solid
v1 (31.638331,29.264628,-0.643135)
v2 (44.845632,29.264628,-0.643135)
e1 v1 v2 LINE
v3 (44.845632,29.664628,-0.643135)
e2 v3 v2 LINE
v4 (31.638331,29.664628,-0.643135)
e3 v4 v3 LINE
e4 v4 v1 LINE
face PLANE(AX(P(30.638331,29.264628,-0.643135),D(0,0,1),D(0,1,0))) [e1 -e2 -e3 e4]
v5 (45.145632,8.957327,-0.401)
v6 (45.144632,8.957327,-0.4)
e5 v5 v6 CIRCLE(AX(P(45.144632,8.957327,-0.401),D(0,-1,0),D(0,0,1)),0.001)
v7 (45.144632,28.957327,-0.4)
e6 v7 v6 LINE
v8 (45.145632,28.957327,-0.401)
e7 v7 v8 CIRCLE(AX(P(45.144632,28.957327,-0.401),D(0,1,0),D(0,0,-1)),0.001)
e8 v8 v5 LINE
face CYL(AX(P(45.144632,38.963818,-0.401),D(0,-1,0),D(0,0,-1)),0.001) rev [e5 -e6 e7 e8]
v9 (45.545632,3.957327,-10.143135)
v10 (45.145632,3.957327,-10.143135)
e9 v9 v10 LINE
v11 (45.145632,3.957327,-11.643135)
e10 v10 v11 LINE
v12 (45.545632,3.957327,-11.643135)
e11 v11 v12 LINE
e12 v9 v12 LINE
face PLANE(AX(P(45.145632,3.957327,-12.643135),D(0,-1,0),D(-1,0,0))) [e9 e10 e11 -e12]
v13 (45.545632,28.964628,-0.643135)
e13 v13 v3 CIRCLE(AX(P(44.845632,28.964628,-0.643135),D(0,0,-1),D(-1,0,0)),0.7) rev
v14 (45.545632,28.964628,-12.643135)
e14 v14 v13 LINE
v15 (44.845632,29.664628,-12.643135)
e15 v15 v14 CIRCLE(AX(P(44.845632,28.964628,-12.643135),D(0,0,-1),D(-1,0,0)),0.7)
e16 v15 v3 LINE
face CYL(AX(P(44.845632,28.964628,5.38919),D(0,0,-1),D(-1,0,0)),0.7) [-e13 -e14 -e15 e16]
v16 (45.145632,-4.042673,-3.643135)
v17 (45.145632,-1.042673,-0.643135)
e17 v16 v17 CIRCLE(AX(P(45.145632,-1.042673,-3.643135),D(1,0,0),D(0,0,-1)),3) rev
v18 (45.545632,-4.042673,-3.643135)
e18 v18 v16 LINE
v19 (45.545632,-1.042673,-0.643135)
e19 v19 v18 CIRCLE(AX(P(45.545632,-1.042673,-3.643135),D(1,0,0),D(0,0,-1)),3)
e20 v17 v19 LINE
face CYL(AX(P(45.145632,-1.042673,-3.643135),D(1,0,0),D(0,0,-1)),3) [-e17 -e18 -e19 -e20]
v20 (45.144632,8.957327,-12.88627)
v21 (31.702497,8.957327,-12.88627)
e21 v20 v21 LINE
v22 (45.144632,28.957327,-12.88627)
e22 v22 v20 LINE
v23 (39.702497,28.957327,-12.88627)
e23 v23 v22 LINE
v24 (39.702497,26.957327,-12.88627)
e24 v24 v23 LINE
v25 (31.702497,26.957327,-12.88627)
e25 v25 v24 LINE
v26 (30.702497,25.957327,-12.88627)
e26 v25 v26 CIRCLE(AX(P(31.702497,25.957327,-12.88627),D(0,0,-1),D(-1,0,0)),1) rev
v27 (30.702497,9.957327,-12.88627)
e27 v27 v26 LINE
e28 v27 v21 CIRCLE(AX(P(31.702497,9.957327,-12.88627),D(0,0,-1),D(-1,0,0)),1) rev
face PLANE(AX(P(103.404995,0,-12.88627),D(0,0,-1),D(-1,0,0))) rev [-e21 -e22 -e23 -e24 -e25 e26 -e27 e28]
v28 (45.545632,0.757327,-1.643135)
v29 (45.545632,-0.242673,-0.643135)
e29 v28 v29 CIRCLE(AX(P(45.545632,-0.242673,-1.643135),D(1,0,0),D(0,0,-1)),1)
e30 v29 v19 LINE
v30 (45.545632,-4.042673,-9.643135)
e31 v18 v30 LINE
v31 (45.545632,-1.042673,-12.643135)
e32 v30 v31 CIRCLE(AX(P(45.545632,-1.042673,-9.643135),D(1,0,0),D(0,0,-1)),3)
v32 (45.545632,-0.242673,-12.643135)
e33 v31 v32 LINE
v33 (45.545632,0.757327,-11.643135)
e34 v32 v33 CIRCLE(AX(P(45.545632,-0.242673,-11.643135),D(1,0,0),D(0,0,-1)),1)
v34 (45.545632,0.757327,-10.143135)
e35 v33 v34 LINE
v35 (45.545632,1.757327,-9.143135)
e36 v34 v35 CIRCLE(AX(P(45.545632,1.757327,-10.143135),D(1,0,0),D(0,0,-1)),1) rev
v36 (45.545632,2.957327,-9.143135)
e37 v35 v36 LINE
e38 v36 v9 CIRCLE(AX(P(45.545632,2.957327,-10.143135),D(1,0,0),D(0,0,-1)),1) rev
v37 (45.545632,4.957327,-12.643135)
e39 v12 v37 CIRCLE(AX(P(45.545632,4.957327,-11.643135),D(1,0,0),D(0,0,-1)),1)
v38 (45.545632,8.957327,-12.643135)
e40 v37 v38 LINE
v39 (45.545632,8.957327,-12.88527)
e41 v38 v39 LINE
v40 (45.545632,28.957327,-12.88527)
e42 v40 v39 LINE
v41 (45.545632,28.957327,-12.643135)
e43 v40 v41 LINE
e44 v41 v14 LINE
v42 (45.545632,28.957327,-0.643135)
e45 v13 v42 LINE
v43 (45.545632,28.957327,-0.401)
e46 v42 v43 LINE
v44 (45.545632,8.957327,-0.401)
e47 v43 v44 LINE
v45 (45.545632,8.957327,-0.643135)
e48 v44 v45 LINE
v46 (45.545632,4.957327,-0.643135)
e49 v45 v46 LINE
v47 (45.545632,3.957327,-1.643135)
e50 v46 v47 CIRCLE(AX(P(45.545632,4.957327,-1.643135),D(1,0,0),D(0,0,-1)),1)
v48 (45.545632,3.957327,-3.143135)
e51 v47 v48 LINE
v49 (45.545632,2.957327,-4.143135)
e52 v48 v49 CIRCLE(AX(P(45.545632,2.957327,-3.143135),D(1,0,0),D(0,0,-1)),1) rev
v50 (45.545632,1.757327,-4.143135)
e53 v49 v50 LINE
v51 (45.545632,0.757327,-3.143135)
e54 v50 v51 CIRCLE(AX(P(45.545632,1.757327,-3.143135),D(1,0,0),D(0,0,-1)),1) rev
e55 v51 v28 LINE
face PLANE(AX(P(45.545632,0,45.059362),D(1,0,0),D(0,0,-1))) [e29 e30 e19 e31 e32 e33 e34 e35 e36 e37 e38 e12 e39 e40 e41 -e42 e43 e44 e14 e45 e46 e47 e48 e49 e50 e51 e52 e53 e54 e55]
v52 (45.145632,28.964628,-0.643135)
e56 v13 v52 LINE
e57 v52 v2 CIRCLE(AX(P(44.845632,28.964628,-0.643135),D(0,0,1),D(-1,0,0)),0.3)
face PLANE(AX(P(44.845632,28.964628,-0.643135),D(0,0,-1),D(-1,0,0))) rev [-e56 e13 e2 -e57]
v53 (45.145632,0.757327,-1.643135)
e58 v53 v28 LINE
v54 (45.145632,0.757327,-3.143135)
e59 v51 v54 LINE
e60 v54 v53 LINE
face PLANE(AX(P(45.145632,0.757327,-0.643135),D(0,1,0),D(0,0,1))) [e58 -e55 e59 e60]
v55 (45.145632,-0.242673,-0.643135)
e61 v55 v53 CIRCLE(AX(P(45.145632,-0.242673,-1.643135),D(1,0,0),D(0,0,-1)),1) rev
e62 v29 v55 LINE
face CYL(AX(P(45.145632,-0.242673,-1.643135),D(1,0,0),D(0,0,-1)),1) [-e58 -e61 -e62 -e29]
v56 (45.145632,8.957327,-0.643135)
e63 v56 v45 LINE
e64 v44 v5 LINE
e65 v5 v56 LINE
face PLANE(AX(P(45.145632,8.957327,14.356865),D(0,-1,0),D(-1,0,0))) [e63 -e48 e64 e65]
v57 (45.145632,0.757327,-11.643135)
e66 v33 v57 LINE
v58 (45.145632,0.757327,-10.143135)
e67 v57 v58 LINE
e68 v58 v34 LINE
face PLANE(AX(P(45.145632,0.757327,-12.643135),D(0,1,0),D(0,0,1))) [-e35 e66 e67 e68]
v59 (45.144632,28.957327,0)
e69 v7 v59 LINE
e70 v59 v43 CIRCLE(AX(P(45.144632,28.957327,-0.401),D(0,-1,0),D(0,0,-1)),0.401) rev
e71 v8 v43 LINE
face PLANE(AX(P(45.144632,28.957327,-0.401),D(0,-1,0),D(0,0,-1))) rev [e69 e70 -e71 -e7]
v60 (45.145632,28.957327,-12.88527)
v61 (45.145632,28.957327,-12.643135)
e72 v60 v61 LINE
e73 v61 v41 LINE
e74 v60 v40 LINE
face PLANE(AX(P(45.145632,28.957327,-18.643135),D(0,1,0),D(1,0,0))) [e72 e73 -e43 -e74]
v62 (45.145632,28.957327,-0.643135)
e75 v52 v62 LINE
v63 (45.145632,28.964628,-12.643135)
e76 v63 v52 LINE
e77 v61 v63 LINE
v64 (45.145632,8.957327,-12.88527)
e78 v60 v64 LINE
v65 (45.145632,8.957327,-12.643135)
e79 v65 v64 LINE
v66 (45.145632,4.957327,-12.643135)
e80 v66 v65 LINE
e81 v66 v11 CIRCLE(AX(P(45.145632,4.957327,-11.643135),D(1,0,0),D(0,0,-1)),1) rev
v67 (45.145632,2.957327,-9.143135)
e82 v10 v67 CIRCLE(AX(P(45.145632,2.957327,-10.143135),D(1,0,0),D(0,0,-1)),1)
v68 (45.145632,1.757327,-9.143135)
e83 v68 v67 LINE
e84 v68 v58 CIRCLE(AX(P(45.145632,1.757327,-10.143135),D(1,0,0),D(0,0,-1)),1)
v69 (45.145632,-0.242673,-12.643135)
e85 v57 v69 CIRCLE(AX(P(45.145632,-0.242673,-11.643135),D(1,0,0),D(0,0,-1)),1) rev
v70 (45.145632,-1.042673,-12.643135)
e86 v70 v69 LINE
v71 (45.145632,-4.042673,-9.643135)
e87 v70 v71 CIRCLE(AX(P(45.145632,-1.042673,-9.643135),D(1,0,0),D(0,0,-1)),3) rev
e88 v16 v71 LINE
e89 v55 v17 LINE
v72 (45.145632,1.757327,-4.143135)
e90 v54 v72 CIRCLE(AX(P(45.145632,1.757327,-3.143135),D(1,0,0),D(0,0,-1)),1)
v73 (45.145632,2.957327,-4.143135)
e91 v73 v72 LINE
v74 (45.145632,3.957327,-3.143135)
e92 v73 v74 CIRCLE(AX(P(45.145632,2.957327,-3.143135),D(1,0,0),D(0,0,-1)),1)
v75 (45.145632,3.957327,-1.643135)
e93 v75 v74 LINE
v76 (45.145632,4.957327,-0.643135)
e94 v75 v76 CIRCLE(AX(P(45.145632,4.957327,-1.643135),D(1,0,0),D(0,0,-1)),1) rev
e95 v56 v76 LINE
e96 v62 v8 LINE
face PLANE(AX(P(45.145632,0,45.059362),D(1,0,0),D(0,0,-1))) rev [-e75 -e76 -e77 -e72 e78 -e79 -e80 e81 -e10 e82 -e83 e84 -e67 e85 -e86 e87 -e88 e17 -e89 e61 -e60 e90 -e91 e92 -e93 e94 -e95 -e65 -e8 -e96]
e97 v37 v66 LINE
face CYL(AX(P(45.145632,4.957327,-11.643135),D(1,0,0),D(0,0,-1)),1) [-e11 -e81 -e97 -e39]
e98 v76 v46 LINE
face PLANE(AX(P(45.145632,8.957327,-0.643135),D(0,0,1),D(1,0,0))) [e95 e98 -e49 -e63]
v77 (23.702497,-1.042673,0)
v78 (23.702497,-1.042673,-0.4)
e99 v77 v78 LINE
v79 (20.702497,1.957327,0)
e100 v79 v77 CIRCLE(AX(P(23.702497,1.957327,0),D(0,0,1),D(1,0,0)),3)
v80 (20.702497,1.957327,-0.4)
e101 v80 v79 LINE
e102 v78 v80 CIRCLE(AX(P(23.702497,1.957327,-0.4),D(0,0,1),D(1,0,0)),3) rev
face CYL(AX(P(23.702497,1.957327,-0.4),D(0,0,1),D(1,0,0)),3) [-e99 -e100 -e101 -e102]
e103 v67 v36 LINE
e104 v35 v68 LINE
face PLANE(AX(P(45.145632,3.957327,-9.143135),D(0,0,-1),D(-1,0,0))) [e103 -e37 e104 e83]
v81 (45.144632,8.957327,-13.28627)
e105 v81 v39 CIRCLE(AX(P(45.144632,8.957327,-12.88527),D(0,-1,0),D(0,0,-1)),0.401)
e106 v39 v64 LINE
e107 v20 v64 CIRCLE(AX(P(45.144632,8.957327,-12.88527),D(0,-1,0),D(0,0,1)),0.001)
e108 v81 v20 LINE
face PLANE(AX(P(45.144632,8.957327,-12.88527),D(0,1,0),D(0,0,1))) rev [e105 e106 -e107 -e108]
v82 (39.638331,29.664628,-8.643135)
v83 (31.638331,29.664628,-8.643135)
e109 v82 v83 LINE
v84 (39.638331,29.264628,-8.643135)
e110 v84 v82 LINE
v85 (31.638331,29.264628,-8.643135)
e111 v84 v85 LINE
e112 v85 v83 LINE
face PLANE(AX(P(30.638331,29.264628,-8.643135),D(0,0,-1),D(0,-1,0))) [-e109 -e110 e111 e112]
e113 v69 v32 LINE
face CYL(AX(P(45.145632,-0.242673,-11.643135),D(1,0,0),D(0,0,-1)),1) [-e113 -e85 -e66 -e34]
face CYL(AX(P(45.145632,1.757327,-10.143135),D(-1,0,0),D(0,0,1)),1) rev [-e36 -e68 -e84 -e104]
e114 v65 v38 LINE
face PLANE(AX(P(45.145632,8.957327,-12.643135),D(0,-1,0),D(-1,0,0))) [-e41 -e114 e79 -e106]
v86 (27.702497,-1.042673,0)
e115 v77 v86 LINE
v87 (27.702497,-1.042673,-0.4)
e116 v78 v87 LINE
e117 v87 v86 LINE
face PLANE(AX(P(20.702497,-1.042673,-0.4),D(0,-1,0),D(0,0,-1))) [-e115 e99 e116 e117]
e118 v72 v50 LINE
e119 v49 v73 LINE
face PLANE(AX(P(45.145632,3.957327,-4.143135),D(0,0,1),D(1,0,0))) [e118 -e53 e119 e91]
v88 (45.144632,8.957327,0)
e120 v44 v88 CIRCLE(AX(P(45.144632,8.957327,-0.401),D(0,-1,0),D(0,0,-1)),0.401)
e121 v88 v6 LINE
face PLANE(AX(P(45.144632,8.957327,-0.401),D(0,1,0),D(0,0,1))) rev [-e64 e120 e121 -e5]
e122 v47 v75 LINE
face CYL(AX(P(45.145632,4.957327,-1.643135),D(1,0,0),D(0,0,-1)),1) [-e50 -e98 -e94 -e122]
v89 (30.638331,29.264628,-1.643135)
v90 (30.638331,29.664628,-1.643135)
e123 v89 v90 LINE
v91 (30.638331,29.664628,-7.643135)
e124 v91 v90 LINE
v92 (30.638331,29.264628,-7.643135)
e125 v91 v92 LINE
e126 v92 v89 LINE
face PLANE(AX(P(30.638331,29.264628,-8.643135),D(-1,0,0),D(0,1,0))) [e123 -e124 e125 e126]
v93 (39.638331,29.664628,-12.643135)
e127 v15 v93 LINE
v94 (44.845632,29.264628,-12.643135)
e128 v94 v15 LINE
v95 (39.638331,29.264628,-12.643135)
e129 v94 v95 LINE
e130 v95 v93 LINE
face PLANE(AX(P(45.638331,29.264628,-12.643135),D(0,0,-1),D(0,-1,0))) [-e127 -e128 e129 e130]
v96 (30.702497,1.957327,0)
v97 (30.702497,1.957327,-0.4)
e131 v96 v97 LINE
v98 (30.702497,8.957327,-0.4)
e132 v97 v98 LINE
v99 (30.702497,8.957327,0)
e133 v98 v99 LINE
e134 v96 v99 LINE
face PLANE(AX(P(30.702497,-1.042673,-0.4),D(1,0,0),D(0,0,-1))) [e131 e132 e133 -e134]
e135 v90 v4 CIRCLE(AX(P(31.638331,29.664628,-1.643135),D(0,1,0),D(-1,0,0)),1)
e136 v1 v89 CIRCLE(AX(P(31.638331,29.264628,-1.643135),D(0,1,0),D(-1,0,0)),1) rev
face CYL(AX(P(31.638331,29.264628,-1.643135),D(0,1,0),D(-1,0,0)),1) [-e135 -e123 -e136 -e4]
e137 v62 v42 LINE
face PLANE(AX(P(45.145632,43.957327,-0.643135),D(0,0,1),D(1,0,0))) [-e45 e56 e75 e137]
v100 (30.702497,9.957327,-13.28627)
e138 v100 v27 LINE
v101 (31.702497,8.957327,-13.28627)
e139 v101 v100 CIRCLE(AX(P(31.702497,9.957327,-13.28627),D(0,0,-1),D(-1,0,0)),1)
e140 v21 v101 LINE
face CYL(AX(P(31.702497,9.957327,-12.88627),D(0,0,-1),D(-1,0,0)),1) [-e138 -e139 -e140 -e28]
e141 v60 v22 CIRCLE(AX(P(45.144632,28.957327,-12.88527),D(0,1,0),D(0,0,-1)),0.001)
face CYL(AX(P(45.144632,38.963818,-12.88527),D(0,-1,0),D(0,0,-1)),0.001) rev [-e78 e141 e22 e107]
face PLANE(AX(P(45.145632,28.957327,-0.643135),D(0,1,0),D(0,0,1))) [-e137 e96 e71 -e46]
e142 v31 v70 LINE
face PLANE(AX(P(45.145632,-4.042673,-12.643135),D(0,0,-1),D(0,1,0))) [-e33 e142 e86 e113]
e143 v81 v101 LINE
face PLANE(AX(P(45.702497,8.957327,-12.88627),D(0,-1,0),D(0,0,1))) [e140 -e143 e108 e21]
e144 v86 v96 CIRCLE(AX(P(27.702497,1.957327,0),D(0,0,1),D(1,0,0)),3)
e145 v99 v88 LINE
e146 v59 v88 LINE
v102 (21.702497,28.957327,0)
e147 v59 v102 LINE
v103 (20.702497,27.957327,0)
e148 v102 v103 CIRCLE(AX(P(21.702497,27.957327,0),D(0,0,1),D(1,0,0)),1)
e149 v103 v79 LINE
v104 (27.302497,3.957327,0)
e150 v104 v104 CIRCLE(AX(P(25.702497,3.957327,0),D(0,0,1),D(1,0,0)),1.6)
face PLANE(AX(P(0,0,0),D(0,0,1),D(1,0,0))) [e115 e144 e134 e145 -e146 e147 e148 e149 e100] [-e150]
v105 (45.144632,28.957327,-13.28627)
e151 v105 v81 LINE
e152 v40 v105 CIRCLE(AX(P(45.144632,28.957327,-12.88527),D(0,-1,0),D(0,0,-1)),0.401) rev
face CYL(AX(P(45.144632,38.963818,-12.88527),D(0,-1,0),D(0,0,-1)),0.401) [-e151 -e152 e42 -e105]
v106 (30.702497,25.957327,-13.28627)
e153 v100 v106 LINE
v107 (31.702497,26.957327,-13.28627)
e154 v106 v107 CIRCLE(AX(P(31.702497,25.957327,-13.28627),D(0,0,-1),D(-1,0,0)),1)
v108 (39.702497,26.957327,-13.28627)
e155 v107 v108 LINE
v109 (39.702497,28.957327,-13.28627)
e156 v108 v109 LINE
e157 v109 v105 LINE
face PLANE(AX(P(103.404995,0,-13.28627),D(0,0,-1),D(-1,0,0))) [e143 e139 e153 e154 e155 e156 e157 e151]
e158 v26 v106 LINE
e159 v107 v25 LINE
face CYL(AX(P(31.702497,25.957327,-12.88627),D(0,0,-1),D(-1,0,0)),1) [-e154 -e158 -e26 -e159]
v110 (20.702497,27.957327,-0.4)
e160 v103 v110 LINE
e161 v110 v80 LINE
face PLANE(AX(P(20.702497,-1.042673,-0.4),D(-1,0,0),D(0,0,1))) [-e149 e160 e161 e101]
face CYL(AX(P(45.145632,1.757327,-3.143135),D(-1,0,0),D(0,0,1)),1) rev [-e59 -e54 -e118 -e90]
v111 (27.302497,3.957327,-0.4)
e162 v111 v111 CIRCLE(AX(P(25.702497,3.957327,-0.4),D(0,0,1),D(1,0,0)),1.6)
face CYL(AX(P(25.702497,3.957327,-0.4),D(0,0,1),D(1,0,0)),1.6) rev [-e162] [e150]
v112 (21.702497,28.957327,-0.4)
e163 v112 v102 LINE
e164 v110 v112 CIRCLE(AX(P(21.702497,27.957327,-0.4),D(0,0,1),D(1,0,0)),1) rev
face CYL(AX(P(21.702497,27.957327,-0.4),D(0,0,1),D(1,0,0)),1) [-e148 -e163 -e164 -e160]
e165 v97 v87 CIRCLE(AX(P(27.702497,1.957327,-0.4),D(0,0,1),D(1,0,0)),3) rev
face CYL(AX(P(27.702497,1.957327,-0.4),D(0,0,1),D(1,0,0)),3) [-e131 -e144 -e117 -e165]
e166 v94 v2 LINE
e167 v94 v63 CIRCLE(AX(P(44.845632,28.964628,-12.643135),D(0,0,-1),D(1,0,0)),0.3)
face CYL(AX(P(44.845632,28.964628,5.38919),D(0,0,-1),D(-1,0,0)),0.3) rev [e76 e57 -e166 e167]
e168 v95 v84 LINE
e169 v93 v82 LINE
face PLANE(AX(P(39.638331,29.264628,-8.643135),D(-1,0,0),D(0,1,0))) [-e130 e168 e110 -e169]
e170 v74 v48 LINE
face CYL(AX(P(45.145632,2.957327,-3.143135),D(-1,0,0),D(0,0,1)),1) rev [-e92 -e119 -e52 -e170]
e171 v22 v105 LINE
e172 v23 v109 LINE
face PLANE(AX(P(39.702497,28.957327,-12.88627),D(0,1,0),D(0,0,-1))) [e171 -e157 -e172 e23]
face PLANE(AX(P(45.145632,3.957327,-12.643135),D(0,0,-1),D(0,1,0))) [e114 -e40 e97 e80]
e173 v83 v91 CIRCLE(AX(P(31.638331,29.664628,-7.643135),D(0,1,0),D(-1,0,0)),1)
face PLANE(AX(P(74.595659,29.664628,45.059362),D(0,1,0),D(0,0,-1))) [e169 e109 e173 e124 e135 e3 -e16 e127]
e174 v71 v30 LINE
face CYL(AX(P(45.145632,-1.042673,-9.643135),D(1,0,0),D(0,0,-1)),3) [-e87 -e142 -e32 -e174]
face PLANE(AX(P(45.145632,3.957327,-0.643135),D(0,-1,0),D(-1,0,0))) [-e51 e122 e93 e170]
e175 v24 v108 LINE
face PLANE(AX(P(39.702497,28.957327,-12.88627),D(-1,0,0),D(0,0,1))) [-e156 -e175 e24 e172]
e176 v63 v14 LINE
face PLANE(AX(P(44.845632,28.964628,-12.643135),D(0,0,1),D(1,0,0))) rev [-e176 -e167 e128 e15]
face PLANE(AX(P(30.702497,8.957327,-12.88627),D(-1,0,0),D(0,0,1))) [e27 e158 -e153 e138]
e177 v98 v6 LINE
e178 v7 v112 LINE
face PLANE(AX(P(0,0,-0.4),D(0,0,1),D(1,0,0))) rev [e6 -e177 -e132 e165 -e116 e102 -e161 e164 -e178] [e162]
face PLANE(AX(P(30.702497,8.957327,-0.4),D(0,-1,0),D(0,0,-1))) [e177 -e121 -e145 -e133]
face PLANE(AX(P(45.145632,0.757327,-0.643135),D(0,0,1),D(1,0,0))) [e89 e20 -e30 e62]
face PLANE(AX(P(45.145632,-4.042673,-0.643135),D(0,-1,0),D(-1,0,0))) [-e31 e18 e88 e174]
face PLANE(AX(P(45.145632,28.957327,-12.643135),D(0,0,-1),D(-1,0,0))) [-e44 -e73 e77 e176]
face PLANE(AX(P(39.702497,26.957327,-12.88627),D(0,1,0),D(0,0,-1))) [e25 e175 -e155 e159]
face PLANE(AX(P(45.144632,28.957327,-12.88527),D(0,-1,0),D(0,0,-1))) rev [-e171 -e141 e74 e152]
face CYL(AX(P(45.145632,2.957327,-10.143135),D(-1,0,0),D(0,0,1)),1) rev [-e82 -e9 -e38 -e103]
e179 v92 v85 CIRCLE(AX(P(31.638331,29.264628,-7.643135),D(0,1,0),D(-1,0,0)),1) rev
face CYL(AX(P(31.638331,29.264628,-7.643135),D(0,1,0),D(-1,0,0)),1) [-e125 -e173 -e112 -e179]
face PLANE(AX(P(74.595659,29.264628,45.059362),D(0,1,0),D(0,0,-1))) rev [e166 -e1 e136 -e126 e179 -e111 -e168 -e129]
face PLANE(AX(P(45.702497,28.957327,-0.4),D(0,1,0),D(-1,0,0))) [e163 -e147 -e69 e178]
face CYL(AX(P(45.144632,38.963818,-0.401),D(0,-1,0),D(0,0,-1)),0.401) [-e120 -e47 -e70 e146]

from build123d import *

# Parameters (mm, degrees)
SKETCH1_R                   = 1.6
BASE_FLANGE1_DEPTH          = 0.4
SKETCHED_START              = 45.702497433
SKETCHED_BEND8_DEPTH        = 12
SKETCHED_BEND8_2_DEPTH      = 8
SKETCHED_START_2            = 53.702497433
SKETCHED_BEND8_3_DEPTH      = 4
SKETCHED_START_3            = -4.042672779
SKETCHED_BEND12_DEPTH       = 33.707300919
SKETCHED_START_4            = 8.957327221
SKETCHED_BEND12_2_DEPTH     = 18
SKETCHED_START_5            = 3.957327221
SKETCHED_BEND12_3_OUTLINE_W = 0.4
SKETCHED_BEND12_3_OUTLINE_H = 12
SKETCHED_BEND12_3_DEPTH     = 25.007300919
SKETCHED_BEND12_4_OUTLINE_W = 0.4
SKETCHED_BEND12_4_OUTLINE_H = 12
SKETCHED_BEND12_4_DEPTH     = 4.8
SKETCHED_START_6            = 0.757327221
SKETCHED_BEND12_5_OUTLINE_W = 0.4
SKETCHED_BEND12_5_OUTLINE_H = 5
SKETCHED_BEND12_5_DEPTH     = 3.2
SKETCHED_START_7            = 26.957327221
SKETCHED_BEND12_6_DEPTH     = 2
SKETCHED_START_8            = -8.643134969
SKETCHED_BEND12_7_DEPTH     = 8
SKETCHED_START_9            = -12.643134969
SKETCHED_BEND12_8_DEPTH     = 4
FILLET1_R                   = 3
FILLET2_R                   = 1
FILLET3_R                   = 1


with BuildPart() as part:
    # Base-Flange1: sheet metal written as solids
    # Sketch1 → Base-Flange1 (new body)
    with BuildSketch(Plane.XY):
        Polygon((30.702497433, -1.042672779), (30.702497433, 8.957327221), (45.702497433, 8.957327221), (45.702497433, 3.957327221), (49.202497433, 3.957327221), (49.202497433, 0.757327221), (45.702497433, 0.757327221), (45.702497433, -4.042672779), (57.702497433, -4.042672779), (57.702497433, 0.757327221), (54.202497433, 0.757327221), (54.202497433, 3.957327221), (57.702497433, 3.957327221), (57.702497433, 8.957327221), (72.702497433, 8.957327221), (72.702497433, 26.957327221), (63.702497433, 26.957327221), (63.702497433, 28.957327221), (57.702497433, 28.957327221), (57.702497433, 34.957327221), (53.702497433, 34.957327221), (53.702497433, 43.957327221), (45.702497433, 43.957327221), (45.702497433, 28.957327221), (20.702497433, 28.957327221), (20.702497433, -1.042672779), align=None)
        with Locations((25.702497433, 3.957327221)):
            Circle(SKETCH1_R, mode=Mode.SUBTRACT)
    extrude(amount=-BASE_FLANGE1_DEPTH)

    # Sketched Bend8: read off the stored shape, not the designer's step
    # Sketched Bend8 outline → Sketched Bend8 (cut)
    with BuildSketch(Plane.YZ.offset(SKETCHED_START)):
        with BuildLine():
            ThreePointArc((28.96462814, 0), (29.338793878, -0.108392022), (29.597083672, -0.4))
            Line((29.597083672, -0.4), (43.957327221, -0.4))
            Line((43.957327221, -0.4), (43.957327221, 0))
            Line((43.957327221, 0), (28.96462814, 0))
        make_face()
    extrude(amount=SKETCHED_BEND8_DEPTH, mode=Mode.SUBTRACT)

    # Sketched Bend8 2 outline → Sketched Bend8 2 (add)
    with BuildSketch(Plane.YZ.offset(SKETCHED_START)):
        with BuildLine():
            Line((29.26462814, -14.907300918), (29.66462814, -14.907300918))
            Line((29.66462814, -14.907300918), (29.66462814, -0.7))
            ThreePointArc((29.66462814, -0.7), (29.647533284, -0.546245118), (29.597083672, -0.4))
            Line((29.597083672, -0.4), (28.96462814, -0.4))
            ThreePointArc((28.96462814, -0.4), (29.176760174, -0.487867966), (29.26462814, -0.7))
            Line((29.26462814, -0.7), (29.26462814, -14.907300918))
        make_face()
    extrude(amount=SKETCHED_BEND8_2_DEPTH)

    # Sketched Bend8 3 outline → Sketched Bend8 3 (add)
    with BuildSketch(Plane.YZ.offset(SKETCHED_START_2)):
        with BuildLine():
            Line((29.26462814, -0.7), (29.26462814, -5.907300918))
            Line((29.26462814, -5.907300918), (29.66462814, -5.907300918))
            Line((29.66462814, -5.907300918), (29.66462814, -0.7))
            ThreePointArc((29.66462814, -0.7), (29.647533284, -0.546245118), (29.597083672, -0.4))
            Line((29.597083672, -0.4), (28.96462814, -0.4))
            ThreePointArc((28.96462814, -0.4), (29.176760174, -0.487867966), (29.26462814, -0.7))
        make_face()
    extrude(amount=SKETCHED_BEND8_3_DEPTH)

    # Sketched Bend12: read off the stored shape, not the designer's step
    # Sketched Bend12 outline → Sketched Bend12 (cut)
    with BuildSketch(Plane(origin=(0, 0, 0), x_dir=(1, 0, 0), z_dir=(0, 1, 0)).offset(SKETCHED_START_3)):
        with BuildLine():
            Line((45.702497433, 0.4), (45.545631155, 0.4))
            ThreePointArc((45.545631155, 0.4), (45.427828447, 0.117096847), (45.144632402, 0))
            Line((45.144632402, 0), (72.702497433, 0))
            Line((72.702497433, 0), (72.702497433, 0.4))
            Line((72.702497433, 0.4), (57.702497433, 0.4))
            Line((57.702497433, 0.4), (57.702497433, 5.907300918))
            Line((57.702497433, 5.907300918), (53.702497433, 5.907300918))
            Line((53.702497433, 5.907300918), (53.702497433, 14.907300918))
            Line((53.702497433, 14.907300918), (45.702497433, 14.907300918))
            Line((45.702497433, 14.907300918), (45.702497433, 0.4))
        make_face()
    extrude(amount=SKETCHED_BEND12_DEPTH, mode=Mode.SUBTRACT)

    # Sketched Bend12 2 outline → Sketched Bend12 2 (add)
    with BuildSketch(Plane(origin=(0, 0, 0), x_dir=(1, 0, 0), z_dir=(0, 1, 0)).offset(SKETCHED_START_4)):
        with BuildLine():
            ThreePointArc((45.145632402, 0.401), (45.145339509, 0.400292893), (45.144632402, 0.4))
            Line((45.144632402, 0.4), (45.545631155, 0.4))
            ThreePointArc((45.545631155, 0.4), (45.54563209, 0.4005), (45.545632402, 0.401))
            Line((45.545632402, 0.401), (45.545632402, 12.885269938))
            ThreePointArc((45.545632402, 12.885269938), (45.428182222, 13.168819758), (45.144632402, 13.286269938))
            Line((45.144632402, 13.286269938), (30.702497433, 13.286269938))
            Line((30.702497433, 13.286269938), (30.702497433, 12.886269938))
            Line((30.702497433, 12.886269938), (45.144632402, 12.886269938))
            ThreePointArc((45.144632402, 12.886269938), (45.145339509, 12.885977045), (45.145632402, 12.885269938))
            Line((45.145632402, 12.885269938), (45.145632402, 0.401))
        make_face()
    extrude(amount=SKETCHED_BEND12_2_DEPTH)

    # Sketched Bend12 3 outline → Sketched Bend12 3 (add)
    with BuildSketch(Plane(origin=(0, 0, 0), x_dir=(1, 0, 0), z_dir=(0, 1, 0)).offset(SKETCHED_START_5)):
        with Locations((45.345632402, 6.643134969)):
            Rectangle(SKETCHED_BEND12_3_OUTLINE_W, SKETCHED_BEND12_3_OUTLINE_H)
    extrude(amount=SKETCHED_BEND12_3_DEPTH)



with BuildPart() as body_2:
    # Sketched Bend12 4 outline → Sketched Bend12 4 (new body)
    with BuildSketch(Plane(origin=(0, 0, 0), x_dir=(1, 0, 0), z_dir=(0, 1, 0)).offset(SKETCHED_START_3)):
        with Locations((45.345632402, 6.643134969)):
            Rectangle(SKETCHED_BEND12_4_OUTLINE_W, SKETCHED_BEND12_4_OUTLINE_H)
    extrude(amount=SKETCHED_BEND12_4_DEPTH)


with BuildPart() as part_1:
    add(part.part)

    add(body_2.part)  # Sketched Bend12 5 merges body 2
    # Sketched Bend12 5 outline → Sketched Bend12 5 (add)
    with BuildSketch(Plane(origin=(0, 0, 0), x_dir=(1, 0, 0), z_dir=(0, 1, 0)).offset(SKETCHED_START_6)):
        with Locations((45.345632402, 6.643134969)):
            Rectangle(SKETCHED_BEND12_5_OUTLINE_W, SKETCHED_BEND12_5_OUTLINE_H)
    extrude(amount=SKETCHED_BEND12_5_DEPTH)

    # Sketched Bend12 6 outline → Sketched Bend12 6 (add)
    with BuildSketch(Plane(origin=(0, 0, 0), x_dir=(1, 0, 0), z_dir=(0, 1, 0)).offset(SKETCHED_START_7)):
        with BuildLine():
            Line((45.145632402, 0.643134969), (45.145632402, 0.401))
            ThreePointArc((45.145632402, 0.401), (45.145339509, 0.400292893), (45.144632402, 0.4))
            Line((45.144632402, 0.4), (45.545631155, 0.4))
            ThreePointArc((45.545631155, 0.4), (45.54563209, 0.4005), (45.545632402, 0.401))
            Line((45.545632402, 0.401), (45.545632402, 0.643134969))
            Line((45.545632402, 0.643134969), (45.145632402, 0.643134969))
        make_face()
        with BuildLine():
            Line((45.145632402, 12.885269938), (45.145632402, 12.643134969))
            Line((45.145632402, 12.643134969), (45.545632402, 12.643134969))
            Line((45.545632402, 12.643134969), (45.545632402, 12.885269938))
            ThreePointArc((45.545632402, 12.885269938), (45.428182222, 13.168819758), (45.144632402, 13.286269938))
            Line((45.144632402, 13.286269938), (39.702497433, 13.286269938))
            Line((39.702497433, 13.286269938), (39.702497433, 12.886269938))
            Line((39.702497433, 12.886269938), (45.144632402, 12.886269938))
            ThreePointArc((45.144632402, 12.886269938), (45.145339509, 12.885977045), (45.145632402, 12.885269938))
        make_face()
    extrude(amount=SKETCHED_BEND12_6_DEPTH)

    # Sketched Bend12 7 outline → Sketched Bend12 7 (add)
    with BuildSketch(Plane.XY.offset(SKETCHED_START_8)):
        with BuildLine():
            ThreePointArc((44.845632402, 29.26462814), (45.057764437, 29.176760175), (45.145632402, 28.96462814))
            Line((45.145632402, 28.96462814), (45.545632402, 28.96462814))
            ThreePointArc((45.545632402, 28.96462814), (45.340607148, 29.459602887), (44.845632402, 29.66462814))
            Line((44.845632402, 29.66462814), (30.638331484, 29.66462814))
            Line((30.638331484, 29.66462814), (30.638331484, 29.26462814))
            Line((30.638331484, 29.26462814), (44.845632402, 29.26462814))
        make_face()
    extrude(amount=SKETCHED_BEND12_7_DEPTH)

    # Sketched Bend12 8 outline → Sketched Bend12 8 (add)
    with BuildSketch(Plane.XY.offset(SKETCHED_START_9)):
        with BuildLine():
            Line((39.638331484, 29.26462814), (44.845632402, 29.26462814))
            ThreePointArc((44.845632402, 29.26462814), (45.057764437, 29.176760175), (45.145632402, 28.96462814))
            Line((45.145632402, 28.96462814), (45.545632402, 28.96462814))
            ThreePointArc((45.545632402, 28.96462814), (45.340607148, 29.459602887), (44.845632402, 29.66462814))
            Line((44.845632402, 29.66462814), (39.638331484, 29.66462814))
            Line((39.638331484, 29.66462814), (39.638331484, 29.26462814))
        make_face()
    extrude(amount=SKETCHED_BEND12_8_DEPTH)

    # Fillet1
    fillet1_edges = [part_1.edges().sort_by_distance(p)[0] for p in [
        (45.345632402, -4.042672779, -0.643134969),
        (45.345632402, -4.042672779, -12.643134969),
        (20.702497433, -1.042672779, -0.2),
        (30.702497433, -1.042672779, -0.2),
    ]]
    fillet(fillet1_edges, radius=FILLET1_R)

    # Fillet2
    fillet2_edges = [part_1.edges().sort_by_distance(p)[0] for p in [
        (20.702497433, 28.957327221, -0.2),
        (30.702497433, 26.957327221, -13.086269938),
        (30.702497433, 8.957327221, -13.086269938),
        (30.638331484, 29.46462814, -0.643134969),
        (30.638331484, 29.46462814, -8.643134969),
    ]]
    fillet(fillet2_edges, radius=FILLET2_R)

    # Fillet3
    fillet3_edges = [part_1.edges().sort_by_distance(p)[0] for p in [
        (45.345632402, 3.957327221, -0.643134969),
        (45.345632402, 3.957327221, -4.143134969),
        (45.345632402, 0.757327221, -4.143134969),
        (45.345632402, 0.757327221, -0.643134969),
        (45.345632402, 0.757327221, -12.643134969),
        (45.345632402, 0.757327221, -9.143134969),
        (45.345632402, 3.957327221, -9.143134969),
        (45.345632402, 3.957327221, -12.643134969),
    ]]
    fillet(fillet3_edges, radius=FILLET3_R)


solid = part_1.part
